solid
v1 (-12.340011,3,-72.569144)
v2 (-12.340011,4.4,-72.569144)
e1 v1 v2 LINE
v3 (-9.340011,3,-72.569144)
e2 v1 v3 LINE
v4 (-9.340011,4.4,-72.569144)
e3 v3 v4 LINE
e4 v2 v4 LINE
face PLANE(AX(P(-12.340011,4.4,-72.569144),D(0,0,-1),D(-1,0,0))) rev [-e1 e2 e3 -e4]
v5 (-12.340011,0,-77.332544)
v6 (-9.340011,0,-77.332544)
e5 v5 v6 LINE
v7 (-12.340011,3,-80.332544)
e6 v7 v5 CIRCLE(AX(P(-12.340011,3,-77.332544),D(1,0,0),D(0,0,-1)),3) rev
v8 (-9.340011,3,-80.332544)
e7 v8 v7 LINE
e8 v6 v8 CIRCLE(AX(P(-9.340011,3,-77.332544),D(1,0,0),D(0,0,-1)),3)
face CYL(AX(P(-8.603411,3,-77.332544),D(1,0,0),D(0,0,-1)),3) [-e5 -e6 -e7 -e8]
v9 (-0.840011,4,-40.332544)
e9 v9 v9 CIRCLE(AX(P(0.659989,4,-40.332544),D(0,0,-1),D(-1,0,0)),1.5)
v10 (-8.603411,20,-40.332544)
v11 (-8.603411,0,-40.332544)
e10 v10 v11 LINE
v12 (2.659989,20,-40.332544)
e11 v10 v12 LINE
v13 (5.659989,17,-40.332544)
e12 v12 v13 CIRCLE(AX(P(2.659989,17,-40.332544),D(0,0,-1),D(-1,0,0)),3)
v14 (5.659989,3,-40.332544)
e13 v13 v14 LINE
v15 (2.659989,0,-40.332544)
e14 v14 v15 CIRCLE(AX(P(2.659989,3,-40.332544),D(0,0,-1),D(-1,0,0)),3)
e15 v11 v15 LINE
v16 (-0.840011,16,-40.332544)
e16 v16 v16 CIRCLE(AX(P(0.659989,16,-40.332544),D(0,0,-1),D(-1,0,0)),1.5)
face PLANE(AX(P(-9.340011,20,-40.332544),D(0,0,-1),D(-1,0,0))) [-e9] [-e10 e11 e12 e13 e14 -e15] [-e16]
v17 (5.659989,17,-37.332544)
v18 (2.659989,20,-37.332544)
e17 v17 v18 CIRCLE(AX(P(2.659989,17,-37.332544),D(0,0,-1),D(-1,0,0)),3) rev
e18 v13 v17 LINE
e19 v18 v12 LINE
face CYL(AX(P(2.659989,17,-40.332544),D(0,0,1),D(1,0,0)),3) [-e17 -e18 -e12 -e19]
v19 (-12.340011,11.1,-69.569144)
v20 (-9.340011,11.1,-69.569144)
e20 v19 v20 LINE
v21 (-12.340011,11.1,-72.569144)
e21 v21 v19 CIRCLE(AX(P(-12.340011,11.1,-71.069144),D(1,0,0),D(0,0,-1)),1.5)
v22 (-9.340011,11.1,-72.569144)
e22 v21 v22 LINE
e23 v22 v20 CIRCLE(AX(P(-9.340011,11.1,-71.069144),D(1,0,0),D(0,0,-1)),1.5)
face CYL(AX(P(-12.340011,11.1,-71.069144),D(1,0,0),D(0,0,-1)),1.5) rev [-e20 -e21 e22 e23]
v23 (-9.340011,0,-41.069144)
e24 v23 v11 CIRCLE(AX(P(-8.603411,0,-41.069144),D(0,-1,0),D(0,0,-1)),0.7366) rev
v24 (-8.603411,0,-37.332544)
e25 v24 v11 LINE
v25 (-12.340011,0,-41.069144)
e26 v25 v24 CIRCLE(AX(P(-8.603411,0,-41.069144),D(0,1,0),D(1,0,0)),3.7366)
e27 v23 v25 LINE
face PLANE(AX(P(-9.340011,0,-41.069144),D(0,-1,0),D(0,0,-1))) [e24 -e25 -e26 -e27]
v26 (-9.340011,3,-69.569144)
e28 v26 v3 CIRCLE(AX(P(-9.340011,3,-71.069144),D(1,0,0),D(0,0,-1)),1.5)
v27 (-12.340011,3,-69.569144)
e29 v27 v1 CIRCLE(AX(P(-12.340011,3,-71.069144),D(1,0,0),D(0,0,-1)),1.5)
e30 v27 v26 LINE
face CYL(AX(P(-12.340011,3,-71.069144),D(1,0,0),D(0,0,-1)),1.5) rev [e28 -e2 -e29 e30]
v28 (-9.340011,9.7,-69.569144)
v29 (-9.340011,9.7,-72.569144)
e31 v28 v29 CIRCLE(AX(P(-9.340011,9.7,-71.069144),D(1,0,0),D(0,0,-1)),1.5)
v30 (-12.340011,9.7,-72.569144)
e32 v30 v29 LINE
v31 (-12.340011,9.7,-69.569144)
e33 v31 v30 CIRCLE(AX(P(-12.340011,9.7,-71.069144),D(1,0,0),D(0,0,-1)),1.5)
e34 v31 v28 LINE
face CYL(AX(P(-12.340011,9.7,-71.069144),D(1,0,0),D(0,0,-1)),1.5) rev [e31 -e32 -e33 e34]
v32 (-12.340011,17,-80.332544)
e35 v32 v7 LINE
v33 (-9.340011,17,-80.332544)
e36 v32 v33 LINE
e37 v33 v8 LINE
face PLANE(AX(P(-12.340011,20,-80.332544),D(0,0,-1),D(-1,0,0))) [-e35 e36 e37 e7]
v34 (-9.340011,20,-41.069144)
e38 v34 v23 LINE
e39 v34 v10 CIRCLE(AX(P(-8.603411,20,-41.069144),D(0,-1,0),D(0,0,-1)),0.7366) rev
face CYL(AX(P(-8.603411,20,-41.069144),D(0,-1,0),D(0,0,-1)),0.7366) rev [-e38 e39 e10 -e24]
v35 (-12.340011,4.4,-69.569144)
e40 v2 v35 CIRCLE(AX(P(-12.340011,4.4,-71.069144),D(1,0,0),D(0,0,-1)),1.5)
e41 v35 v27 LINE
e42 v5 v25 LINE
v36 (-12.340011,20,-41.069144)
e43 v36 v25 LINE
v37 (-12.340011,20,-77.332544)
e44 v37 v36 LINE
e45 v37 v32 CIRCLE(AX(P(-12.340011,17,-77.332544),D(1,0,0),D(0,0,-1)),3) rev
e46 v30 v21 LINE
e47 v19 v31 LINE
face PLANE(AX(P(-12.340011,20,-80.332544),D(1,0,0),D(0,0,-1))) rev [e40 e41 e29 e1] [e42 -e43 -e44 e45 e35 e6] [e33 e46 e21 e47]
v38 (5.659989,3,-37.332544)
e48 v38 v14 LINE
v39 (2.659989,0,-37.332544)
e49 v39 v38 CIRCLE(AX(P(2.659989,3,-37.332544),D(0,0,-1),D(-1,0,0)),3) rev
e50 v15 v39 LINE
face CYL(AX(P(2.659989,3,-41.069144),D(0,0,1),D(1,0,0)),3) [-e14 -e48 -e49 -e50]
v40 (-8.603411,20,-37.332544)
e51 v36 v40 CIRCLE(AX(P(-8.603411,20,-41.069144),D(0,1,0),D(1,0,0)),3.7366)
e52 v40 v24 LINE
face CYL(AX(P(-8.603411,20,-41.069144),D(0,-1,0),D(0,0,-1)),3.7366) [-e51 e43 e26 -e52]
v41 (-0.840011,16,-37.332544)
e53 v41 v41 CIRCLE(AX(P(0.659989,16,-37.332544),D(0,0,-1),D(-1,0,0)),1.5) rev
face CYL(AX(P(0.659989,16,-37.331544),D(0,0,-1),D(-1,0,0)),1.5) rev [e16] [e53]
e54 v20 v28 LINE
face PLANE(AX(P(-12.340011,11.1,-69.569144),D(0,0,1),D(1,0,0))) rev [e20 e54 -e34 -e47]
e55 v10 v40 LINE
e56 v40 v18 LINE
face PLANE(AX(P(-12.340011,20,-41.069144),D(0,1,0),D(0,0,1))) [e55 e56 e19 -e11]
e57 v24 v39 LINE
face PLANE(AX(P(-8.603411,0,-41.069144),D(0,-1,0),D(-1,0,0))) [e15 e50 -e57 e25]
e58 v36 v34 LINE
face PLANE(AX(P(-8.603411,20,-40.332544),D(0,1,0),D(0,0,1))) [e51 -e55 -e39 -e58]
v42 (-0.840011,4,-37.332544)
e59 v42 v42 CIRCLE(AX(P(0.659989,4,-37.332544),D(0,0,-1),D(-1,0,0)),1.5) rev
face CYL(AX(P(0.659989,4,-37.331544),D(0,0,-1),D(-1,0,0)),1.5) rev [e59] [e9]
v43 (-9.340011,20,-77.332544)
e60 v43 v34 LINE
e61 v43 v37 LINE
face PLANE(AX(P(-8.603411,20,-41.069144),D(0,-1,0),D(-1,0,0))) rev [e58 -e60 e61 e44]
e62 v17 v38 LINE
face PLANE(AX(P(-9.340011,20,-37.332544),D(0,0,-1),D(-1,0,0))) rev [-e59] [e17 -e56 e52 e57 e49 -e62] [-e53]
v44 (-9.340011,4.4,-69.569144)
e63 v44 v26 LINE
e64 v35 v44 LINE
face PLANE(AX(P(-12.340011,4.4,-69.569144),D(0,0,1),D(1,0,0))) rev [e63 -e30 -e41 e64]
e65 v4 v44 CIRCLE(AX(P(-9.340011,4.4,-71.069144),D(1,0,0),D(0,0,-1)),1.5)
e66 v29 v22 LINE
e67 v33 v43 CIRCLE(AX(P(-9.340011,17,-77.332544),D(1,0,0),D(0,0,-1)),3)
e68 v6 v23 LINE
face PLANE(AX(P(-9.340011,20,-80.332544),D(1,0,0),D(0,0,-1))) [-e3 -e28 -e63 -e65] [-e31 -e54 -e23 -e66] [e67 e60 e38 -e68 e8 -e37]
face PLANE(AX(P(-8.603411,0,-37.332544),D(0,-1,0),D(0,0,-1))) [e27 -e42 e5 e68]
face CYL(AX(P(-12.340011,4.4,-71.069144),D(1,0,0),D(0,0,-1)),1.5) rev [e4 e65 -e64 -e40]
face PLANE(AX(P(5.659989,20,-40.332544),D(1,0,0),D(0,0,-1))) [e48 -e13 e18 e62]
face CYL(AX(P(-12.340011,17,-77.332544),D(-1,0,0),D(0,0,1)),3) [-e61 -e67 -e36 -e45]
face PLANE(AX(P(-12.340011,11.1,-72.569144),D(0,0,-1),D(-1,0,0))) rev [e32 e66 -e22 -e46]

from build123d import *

# Parameters (mm, degrees)
BASE_FLANGE1_DEPTH = 20
CUT_EXTRUDE1_REACH = 48.393
SKETCH6_R          = 1.5
FILLET1_R          = 3
FILLET2_R          = 3
CUT_EXTRUDE4_DEPTH = 85.132737956


# Sheet-metal steps are written as plain solids
with BuildPart() as part:
    # Sketch1 → Base-Flange1 (new body)
    with BuildSketch(Plane(origin=(0, 0, 0), x_dir=(1, 0, 0), z_dir=(0, 1, 0))):
        with BuildLine():
            Line((-9.340010949, 80.332543816), (-9.340010949, 41.069143816))
            ThreePointArc((-9.340010949, 41.069143816), (-9.124265804, 40.548288961), (-8.603410949, 40.332543816))
            Line((-8.603410949, 40.332543816), (5.659989051, 40.332543816))
            Line((5.659989051, 40.332543816), (5.659989051, 37.332543816))
            Line((5.659989051, 37.332543816), (-8.603410949, 37.332543816))
            ThreePointArc((-8.603410949, 37.332543816), (-11.245586147, 38.426968618), (-12.340010949, 41.069143816))
            Line((-12.340010949, 41.069143816), (-12.340010949, 80.332543816))
            Line((-12.340010949, 80.332543816), (-9.340010949, 80.332543816))
        make_face()
    extrude(amount=BASE_FLANGE1_DEPTH)

    # Sketch6 → Cut-Extrude1 (cut, up to next)
    with BuildSketch(Plane(origin=(0, 0, -40.332543816), x_dir=(-1, 0, 0), z_dir=(0, 0, -1)), mode=Mode.PRIVATE) as cut_extrude1_sk1:
        with Locations((-0.659989051, 16)):
            Circle(SKETCH6_R)
    cut_extrude1_tool1 = extrude(cut_extrude1_sk1.sketch, amount=-CUT_EXTRUDE1_REACH, mode=Mode.PRIVATE) & part.part
    # Sketch6 → Cut-Extrude1 (cut, up to next)
    with BuildSketch(Plane(origin=(0, 0, -40.332543816), x_dir=(-1, 0, 0), z_dir=(0, 0, -1)), mode=Mode.PRIVATE) as cut_extrude1_sk2:
        with Locations((-0.659989051, 4)):
            Circle(SKETCH6_R)
    cut_extrude1_tool2 = extrude(cut_extrude1_sk2.sketch, amount=-CUT_EXTRUDE1_REACH, mode=Mode.PRIVATE) & part.part
    add(cut_extrude1_tool1.solids().sort_by_distance((0.659989, 16, -40.332544))[0], mode=Mode.SUBTRACT)
    add(cut_extrude1_tool2.solids().sort_by_distance((0.659989, 4, -40.332544))[0], mode=Mode.SUBTRACT)

    # Fillet1
    fillet1_edges = [part.edges().sort_by_distance(p)[0] for p in [
        (5.659989051, 20, -38.832543816),
        (5.659989051, 0, -38.832543816),
    ]]
    fillet(fillet1_edges, radius=FILLET1_R)

    # Fillet2
    fillet2_edges = [part.edges().sort_by_distance(p)[0] for p in [
        (-10.840010949, 20, -80.332543816),
        (-10.840010949, 0, -80.332543816),
    ]]
    fillet(fillet2_edges, radius=FILLET2_R)

    # Sketch7 → Cut-Extrude4 (cut, through all)
    with BuildSketch(Plane(origin=(-9.340010949, 0, 0), x_dir=(0, 0, -1), z_dir=(1, 0, 0))):
        with BuildLine():
            Line((72.569143816, 11.1), (72.569143816, 9.7))
            ThreePointArc((72.569143816, 9.7), (71.069143816, 8.2), (69.569143816, 9.7))
            Line((69.569143816, 9.7), (69.569143816, 11.1))
            ThreePointArc((69.569143816, 11.1), (71.069143816, 12.6), (72.569143816, 11.1))
        make_face()
        with BuildLine():
            Line((72.569143816, 4.4), (72.569143816, 3))
            ThreePointArc((72.569143816, 3), (71.069143816, 1.5), (69.569143816, 3))
            Line((69.569143816, 3), (69.569143816, 4.4))
            ThreePointArc((69.569143816, 4.4), (71.069143816, 5.9), (72.569143816, 4.4))
        make_face()
    extrude(amount=-CUT_EXTRUDE4_DEPTH, mode=Mode.SUBTRACT)


solid = part.part
